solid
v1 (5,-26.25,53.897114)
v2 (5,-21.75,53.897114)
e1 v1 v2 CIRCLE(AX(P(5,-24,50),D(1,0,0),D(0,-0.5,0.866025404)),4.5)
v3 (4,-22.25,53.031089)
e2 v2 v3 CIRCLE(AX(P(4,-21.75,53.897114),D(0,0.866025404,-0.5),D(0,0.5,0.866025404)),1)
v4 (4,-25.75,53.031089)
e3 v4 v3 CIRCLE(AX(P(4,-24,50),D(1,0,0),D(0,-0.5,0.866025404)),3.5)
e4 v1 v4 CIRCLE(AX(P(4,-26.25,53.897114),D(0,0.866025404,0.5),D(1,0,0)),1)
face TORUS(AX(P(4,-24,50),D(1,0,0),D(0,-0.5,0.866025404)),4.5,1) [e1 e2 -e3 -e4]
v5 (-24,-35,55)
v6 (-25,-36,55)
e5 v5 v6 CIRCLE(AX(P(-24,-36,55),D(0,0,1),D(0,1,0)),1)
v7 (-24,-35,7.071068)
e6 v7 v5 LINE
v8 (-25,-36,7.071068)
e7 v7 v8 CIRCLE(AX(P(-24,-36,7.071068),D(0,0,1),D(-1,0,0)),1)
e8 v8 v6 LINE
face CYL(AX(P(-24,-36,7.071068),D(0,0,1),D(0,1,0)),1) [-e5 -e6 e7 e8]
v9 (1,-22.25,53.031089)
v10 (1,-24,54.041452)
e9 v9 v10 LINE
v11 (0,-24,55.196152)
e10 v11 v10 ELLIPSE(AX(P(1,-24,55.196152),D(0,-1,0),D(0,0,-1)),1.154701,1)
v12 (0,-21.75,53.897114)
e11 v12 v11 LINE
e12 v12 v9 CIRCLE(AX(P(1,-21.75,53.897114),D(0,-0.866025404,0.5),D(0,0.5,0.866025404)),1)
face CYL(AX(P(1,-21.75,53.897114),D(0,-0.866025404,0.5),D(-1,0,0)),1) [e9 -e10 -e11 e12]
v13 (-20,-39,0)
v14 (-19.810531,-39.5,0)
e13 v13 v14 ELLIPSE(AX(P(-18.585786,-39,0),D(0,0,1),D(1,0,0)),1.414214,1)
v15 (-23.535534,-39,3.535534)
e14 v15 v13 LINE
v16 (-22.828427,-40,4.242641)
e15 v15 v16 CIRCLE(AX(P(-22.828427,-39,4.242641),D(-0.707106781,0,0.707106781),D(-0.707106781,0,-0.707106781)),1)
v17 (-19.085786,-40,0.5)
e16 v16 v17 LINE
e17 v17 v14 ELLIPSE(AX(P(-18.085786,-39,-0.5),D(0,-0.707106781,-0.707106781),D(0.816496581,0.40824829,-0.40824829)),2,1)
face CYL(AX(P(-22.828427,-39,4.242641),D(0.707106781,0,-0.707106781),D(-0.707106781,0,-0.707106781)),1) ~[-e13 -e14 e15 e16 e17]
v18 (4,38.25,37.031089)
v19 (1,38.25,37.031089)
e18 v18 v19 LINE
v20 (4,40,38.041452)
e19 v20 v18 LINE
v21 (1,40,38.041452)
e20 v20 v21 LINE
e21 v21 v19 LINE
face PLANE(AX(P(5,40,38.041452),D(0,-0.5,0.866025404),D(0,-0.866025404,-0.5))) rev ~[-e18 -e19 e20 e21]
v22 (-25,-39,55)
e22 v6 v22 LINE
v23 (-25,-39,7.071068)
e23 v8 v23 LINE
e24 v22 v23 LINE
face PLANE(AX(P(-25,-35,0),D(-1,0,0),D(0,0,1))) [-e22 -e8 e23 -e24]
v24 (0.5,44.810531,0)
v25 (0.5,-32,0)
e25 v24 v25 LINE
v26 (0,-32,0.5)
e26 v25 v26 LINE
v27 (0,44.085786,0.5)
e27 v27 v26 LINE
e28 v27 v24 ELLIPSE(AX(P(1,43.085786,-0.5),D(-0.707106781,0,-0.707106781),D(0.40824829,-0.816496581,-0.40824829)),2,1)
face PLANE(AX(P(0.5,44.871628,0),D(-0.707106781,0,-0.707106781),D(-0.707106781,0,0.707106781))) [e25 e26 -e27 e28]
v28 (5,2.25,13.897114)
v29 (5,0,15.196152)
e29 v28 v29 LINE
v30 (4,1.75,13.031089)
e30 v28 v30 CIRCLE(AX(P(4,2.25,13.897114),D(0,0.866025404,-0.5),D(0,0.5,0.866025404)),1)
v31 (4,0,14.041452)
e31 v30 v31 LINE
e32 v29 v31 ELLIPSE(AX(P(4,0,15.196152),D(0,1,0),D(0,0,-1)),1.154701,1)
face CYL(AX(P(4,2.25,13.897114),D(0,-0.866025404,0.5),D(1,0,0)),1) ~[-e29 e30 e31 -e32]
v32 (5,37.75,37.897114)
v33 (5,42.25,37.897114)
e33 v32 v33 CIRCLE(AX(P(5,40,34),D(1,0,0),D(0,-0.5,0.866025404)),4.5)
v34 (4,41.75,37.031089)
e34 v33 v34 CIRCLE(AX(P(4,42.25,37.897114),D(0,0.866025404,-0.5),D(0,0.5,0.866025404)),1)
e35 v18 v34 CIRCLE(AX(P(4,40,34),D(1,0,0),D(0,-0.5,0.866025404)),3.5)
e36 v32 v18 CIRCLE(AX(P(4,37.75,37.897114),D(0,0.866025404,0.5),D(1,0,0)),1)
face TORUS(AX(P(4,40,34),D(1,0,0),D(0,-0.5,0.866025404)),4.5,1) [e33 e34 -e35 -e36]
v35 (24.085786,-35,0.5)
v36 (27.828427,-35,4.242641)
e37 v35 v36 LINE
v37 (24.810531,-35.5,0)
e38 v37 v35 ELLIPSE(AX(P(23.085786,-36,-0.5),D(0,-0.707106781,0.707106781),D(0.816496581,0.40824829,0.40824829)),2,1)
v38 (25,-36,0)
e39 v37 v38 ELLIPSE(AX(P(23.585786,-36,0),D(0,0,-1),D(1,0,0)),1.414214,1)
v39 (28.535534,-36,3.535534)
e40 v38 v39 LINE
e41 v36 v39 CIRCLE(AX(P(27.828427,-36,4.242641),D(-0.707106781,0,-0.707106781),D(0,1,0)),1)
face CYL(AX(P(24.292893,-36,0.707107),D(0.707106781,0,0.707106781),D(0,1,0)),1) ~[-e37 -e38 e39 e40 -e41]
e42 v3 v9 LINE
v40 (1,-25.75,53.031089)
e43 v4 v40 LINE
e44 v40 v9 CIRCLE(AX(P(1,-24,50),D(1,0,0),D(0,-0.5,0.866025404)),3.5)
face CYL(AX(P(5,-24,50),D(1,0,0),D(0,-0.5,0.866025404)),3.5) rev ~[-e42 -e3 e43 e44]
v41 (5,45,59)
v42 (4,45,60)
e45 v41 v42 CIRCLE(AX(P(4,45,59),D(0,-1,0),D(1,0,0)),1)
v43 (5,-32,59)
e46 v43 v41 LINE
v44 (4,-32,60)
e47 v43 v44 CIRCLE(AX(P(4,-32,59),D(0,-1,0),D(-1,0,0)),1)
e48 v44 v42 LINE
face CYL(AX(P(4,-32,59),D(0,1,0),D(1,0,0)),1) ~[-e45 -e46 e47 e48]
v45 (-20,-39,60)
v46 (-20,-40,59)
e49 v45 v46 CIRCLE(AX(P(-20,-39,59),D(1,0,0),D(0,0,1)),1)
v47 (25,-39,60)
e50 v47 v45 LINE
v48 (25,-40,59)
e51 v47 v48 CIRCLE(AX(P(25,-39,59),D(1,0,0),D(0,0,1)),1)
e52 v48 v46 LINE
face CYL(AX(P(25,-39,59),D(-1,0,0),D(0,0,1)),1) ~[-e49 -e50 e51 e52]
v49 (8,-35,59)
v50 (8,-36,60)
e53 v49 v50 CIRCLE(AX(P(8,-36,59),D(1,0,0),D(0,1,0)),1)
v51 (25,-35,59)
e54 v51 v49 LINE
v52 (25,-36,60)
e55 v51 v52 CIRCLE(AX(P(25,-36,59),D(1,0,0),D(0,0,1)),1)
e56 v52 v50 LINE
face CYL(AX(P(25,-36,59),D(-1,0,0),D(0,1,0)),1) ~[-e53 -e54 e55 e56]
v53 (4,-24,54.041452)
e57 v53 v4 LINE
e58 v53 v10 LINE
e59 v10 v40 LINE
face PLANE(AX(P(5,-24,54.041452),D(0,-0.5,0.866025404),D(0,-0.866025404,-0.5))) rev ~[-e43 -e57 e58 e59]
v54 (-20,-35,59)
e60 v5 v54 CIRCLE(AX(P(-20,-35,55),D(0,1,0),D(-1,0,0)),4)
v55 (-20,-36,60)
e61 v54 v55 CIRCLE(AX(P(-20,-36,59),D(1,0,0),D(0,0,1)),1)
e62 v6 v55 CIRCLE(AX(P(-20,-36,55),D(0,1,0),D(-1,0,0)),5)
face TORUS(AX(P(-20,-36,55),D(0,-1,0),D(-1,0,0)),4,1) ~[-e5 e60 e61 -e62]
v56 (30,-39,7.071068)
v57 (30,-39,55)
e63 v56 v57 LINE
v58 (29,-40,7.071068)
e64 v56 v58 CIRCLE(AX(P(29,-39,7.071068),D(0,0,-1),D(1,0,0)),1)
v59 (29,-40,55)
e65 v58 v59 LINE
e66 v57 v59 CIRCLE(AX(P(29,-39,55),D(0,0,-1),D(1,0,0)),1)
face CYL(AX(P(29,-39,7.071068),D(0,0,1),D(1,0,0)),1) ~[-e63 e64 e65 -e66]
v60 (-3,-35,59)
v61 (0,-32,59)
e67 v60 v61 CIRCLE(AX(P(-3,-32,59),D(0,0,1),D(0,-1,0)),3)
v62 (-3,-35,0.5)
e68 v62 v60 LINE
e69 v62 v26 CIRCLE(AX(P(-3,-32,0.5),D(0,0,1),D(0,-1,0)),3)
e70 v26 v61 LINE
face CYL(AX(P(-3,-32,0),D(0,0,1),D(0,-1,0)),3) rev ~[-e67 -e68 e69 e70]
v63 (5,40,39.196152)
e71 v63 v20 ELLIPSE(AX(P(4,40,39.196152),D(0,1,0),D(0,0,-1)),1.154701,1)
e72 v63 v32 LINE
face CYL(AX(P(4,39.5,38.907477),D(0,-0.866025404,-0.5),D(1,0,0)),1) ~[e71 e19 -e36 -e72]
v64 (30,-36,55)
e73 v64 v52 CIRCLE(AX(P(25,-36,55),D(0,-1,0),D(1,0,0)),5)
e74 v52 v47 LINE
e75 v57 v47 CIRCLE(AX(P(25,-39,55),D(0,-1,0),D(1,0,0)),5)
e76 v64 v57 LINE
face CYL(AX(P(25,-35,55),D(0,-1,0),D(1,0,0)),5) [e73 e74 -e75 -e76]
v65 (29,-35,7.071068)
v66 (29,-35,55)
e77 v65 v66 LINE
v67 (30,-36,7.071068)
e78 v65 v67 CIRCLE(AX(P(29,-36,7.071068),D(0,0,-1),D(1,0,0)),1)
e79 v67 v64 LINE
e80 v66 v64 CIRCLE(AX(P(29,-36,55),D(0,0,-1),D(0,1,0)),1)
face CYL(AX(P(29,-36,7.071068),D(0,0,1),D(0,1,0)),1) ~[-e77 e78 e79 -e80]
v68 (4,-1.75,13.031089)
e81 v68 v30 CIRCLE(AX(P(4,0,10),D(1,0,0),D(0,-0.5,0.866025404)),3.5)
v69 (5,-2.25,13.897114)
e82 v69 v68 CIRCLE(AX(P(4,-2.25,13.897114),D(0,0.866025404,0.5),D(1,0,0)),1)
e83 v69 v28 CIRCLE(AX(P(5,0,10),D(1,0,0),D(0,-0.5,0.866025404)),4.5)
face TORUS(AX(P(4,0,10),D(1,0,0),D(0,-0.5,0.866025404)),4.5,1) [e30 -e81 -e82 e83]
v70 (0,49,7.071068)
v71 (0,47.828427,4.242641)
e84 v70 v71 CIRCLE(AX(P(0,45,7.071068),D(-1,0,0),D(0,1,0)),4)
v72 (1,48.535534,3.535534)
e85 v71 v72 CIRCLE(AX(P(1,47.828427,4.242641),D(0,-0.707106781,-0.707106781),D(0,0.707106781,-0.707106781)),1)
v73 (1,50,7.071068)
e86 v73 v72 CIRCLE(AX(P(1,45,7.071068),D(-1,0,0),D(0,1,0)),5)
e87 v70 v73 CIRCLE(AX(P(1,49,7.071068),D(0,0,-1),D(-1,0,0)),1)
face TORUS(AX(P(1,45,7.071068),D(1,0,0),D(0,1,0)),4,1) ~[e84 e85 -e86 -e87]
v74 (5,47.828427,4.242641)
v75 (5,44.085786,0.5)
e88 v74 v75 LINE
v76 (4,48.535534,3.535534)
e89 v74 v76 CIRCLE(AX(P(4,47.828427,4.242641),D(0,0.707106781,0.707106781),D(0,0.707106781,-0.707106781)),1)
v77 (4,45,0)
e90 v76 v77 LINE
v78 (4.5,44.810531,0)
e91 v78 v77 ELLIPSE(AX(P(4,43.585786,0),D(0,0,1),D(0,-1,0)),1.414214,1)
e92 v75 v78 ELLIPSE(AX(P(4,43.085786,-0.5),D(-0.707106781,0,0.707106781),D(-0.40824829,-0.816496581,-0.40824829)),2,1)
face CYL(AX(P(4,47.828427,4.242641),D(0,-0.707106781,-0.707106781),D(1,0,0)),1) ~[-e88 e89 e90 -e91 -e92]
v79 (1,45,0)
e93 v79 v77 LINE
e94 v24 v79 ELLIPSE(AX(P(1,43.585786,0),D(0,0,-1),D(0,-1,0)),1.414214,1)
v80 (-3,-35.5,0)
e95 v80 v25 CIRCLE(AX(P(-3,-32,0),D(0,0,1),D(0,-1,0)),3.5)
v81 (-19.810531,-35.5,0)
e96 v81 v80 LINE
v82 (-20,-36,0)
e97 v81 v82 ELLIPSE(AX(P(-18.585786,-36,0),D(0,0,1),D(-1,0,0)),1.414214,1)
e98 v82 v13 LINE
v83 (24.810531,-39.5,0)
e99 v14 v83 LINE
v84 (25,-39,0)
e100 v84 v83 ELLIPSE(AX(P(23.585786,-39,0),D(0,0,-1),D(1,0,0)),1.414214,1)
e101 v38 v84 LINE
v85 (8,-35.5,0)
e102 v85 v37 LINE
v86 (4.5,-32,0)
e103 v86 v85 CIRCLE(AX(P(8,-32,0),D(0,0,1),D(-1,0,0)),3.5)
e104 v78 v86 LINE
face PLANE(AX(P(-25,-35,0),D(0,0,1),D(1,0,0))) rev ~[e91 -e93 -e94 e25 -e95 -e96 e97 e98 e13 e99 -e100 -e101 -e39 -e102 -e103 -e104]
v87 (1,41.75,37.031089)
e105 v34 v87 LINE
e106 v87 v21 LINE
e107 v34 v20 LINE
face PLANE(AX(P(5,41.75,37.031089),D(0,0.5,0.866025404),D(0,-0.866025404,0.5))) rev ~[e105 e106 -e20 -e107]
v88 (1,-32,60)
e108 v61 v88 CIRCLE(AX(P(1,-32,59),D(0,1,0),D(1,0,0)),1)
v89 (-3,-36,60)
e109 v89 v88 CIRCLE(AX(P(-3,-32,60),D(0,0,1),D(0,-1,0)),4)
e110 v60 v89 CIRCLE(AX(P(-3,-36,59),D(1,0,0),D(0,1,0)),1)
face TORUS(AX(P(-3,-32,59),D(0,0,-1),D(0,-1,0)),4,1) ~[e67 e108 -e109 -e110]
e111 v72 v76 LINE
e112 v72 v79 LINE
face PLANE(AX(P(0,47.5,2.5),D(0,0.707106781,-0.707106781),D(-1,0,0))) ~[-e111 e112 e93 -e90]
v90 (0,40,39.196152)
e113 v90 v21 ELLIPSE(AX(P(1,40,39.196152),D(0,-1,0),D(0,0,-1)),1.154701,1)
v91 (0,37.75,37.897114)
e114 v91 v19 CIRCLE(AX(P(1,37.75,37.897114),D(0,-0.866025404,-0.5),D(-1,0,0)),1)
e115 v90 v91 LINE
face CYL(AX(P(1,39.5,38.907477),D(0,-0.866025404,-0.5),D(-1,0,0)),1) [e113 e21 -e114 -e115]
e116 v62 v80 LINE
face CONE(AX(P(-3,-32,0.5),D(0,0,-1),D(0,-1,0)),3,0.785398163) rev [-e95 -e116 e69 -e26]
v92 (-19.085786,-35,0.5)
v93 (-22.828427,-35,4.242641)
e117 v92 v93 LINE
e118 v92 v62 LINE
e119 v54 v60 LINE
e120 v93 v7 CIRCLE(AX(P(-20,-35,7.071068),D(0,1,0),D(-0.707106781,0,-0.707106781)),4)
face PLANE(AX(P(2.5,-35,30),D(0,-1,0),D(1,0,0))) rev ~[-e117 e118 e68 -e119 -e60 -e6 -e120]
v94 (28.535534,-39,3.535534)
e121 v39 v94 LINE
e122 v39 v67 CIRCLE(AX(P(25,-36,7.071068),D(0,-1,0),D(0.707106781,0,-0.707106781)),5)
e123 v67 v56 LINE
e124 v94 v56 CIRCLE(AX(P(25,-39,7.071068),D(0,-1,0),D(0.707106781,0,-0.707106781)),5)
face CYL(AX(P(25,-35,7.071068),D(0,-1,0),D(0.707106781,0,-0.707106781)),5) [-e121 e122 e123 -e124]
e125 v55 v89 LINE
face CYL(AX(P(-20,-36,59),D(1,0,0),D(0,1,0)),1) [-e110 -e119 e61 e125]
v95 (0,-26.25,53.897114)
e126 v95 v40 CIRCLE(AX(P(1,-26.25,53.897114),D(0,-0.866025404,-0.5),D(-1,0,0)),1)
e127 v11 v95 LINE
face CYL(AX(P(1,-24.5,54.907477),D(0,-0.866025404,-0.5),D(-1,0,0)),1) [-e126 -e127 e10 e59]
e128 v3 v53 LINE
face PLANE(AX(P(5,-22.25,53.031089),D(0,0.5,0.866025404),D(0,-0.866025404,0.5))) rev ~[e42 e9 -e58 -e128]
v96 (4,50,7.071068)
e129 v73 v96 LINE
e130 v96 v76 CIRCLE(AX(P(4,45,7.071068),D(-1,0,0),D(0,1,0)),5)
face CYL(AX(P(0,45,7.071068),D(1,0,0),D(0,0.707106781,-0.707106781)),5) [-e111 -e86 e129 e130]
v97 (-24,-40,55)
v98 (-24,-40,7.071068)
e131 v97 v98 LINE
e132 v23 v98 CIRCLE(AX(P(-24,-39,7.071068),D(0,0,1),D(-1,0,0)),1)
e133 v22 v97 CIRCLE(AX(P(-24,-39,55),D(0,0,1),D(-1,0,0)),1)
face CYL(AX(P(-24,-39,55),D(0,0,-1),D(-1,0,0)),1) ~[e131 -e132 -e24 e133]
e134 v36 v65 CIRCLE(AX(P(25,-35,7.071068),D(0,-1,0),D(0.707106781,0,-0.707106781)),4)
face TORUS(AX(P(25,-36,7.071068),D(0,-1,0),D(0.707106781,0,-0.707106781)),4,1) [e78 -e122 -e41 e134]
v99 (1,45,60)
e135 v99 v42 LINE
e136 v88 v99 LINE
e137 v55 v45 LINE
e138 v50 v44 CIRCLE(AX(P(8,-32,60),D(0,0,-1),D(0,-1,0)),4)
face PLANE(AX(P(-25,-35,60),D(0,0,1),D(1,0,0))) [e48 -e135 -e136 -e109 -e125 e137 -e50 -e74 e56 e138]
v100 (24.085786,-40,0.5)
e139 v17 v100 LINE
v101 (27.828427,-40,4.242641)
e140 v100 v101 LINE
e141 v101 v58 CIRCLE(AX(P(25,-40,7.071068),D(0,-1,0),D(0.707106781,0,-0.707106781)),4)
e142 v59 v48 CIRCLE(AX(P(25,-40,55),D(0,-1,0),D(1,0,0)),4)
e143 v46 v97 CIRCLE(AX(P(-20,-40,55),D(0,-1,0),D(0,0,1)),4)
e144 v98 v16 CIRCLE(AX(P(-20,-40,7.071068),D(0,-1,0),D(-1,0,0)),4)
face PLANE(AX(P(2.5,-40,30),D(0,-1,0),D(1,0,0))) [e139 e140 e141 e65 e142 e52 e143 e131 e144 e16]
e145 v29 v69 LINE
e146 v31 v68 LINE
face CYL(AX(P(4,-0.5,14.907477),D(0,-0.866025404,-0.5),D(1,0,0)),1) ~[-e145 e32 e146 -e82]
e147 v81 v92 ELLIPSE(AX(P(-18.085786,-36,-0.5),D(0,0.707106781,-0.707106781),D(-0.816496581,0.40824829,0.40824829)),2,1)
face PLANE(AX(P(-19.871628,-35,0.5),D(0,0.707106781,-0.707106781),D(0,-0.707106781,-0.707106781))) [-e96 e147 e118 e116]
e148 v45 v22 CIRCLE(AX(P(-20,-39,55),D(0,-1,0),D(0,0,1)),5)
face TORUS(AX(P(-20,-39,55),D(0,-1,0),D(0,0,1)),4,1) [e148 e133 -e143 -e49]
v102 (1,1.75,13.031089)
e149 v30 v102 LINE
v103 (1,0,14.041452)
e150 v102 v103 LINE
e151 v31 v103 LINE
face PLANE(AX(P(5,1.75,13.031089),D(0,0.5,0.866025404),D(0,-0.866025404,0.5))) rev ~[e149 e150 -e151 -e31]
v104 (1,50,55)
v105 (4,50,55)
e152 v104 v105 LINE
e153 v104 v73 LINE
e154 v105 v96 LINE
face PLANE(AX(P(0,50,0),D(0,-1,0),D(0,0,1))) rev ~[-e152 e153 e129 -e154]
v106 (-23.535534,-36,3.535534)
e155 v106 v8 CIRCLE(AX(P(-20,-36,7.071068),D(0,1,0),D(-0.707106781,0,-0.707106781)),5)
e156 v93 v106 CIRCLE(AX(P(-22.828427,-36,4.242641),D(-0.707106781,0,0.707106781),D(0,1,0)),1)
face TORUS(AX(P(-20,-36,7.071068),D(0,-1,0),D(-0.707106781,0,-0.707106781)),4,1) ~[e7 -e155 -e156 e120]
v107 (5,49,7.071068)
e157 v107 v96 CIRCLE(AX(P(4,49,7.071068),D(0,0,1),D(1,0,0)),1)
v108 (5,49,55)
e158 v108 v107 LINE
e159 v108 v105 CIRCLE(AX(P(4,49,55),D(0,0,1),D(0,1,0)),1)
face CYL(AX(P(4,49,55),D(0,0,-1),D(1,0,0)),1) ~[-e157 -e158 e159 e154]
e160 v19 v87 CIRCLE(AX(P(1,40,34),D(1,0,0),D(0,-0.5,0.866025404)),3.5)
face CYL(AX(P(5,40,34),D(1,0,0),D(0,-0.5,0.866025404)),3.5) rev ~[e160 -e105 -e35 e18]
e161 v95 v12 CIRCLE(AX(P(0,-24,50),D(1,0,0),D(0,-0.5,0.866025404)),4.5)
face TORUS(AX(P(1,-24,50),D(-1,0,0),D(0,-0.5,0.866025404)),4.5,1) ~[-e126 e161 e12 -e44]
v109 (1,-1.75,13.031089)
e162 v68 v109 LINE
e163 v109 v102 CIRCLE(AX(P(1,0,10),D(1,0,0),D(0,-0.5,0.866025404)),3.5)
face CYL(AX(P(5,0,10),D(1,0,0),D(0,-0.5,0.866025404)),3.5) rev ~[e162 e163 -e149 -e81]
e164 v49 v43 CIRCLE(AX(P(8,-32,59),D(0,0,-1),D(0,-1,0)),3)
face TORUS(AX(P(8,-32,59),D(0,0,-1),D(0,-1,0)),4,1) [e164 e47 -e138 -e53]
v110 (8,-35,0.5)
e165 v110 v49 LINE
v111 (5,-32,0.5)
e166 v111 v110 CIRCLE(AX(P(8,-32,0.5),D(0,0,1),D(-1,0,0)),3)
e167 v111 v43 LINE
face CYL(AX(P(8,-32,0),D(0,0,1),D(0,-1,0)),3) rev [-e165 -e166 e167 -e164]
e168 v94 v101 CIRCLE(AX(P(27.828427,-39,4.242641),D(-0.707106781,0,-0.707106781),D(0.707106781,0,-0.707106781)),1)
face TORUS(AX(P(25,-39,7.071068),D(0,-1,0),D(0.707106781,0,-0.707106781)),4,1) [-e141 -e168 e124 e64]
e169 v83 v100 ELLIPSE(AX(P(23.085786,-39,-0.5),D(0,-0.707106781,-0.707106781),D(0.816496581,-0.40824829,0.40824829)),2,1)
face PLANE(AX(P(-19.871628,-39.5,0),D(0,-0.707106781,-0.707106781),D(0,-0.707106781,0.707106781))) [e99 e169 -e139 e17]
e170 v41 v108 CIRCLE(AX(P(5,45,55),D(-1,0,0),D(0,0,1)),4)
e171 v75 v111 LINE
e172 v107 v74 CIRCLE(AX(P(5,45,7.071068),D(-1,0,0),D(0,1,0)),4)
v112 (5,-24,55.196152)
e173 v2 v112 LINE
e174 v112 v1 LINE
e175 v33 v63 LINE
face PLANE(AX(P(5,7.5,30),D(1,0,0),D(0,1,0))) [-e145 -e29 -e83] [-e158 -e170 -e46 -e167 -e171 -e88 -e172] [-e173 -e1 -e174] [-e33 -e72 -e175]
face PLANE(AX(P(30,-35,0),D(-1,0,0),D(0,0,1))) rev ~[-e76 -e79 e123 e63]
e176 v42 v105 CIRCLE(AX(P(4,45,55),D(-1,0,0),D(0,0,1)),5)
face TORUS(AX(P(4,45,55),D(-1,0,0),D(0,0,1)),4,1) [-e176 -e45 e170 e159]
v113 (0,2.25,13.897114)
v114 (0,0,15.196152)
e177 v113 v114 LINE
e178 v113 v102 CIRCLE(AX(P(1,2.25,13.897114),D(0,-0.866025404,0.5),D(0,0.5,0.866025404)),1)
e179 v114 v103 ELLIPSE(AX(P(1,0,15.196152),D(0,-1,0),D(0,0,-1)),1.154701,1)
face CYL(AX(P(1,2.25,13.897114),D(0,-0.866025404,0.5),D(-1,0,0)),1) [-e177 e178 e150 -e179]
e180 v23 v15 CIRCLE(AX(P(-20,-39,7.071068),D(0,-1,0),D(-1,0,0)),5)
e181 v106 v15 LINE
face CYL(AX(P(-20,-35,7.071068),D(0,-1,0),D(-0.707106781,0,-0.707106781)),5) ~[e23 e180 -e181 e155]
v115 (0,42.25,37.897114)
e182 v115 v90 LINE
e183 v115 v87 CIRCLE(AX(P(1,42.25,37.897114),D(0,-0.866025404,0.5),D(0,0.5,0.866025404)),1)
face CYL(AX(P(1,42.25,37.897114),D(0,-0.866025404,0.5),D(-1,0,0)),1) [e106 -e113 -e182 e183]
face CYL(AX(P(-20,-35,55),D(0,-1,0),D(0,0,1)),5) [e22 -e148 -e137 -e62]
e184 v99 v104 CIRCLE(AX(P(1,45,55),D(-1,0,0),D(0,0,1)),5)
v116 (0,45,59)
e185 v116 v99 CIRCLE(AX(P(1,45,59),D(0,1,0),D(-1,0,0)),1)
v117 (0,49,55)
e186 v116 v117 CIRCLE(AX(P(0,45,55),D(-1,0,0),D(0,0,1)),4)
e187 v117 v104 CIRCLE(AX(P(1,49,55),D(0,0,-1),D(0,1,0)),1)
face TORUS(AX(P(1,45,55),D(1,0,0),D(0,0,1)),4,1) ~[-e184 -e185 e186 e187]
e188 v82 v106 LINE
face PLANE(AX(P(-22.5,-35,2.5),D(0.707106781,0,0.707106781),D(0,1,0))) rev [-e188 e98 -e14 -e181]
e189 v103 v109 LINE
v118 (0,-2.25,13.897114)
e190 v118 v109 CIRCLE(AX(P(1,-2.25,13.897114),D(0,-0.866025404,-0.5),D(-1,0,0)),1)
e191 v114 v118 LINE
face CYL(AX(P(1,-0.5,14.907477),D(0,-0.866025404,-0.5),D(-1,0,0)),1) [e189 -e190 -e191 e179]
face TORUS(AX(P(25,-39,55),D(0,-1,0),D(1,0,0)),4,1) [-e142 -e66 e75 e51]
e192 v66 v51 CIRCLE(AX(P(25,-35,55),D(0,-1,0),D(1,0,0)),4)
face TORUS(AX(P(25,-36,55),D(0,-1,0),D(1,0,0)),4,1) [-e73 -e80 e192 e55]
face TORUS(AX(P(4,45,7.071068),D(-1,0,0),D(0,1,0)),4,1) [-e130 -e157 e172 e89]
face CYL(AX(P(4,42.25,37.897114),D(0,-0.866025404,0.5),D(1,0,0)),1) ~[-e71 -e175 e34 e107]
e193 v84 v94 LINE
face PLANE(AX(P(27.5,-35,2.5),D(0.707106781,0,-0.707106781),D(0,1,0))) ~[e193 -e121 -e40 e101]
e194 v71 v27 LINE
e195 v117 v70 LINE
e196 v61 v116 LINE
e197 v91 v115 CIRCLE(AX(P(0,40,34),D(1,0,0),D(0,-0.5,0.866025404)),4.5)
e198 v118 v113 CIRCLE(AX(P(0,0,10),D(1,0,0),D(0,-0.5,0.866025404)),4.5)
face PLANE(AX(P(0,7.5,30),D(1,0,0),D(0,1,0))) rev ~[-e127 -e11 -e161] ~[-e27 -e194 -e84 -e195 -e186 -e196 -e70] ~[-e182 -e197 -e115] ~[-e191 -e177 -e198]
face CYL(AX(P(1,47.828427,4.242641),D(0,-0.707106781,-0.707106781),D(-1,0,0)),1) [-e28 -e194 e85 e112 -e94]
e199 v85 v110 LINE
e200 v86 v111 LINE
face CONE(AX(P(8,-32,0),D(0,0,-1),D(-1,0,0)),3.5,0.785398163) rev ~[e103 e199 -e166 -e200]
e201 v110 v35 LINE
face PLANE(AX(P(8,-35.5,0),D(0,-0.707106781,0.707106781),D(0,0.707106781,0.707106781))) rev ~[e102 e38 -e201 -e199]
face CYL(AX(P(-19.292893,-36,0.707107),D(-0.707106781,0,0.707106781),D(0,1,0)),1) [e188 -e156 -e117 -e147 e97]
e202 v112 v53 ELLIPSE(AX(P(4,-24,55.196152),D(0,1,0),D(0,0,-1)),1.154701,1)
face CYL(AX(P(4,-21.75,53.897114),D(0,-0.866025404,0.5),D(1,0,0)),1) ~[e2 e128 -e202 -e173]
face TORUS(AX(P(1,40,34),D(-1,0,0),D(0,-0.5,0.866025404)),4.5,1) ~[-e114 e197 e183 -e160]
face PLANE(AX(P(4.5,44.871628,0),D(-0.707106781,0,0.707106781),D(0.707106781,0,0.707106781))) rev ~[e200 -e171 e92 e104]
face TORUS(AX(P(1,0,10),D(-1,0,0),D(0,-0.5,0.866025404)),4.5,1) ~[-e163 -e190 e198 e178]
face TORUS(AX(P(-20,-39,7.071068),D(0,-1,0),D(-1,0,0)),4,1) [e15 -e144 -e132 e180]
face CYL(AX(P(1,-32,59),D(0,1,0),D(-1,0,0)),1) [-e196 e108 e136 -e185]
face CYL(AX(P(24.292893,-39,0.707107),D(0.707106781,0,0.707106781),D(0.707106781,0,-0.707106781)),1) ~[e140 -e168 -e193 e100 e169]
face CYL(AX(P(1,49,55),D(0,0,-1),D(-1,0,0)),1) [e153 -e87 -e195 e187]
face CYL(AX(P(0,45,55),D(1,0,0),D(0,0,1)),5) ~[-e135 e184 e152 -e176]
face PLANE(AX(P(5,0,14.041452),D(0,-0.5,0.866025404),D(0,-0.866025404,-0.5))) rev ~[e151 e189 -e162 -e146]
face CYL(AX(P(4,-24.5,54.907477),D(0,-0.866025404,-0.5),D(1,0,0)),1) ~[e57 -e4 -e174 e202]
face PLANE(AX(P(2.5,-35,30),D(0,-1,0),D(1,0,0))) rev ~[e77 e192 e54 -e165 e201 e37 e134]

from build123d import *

# Parameters (mm, degrees)
F0_W          = 85
F0_H          = 60
F1_DEPTH      = 5
F2_W          = 55
F2_H          = 60
F3_DEPTH      = 5
F5_DEPTH      = 5
F6_R          = 3
F7_SIZE       = 5
F8_R          = 5
F9_R          = 1
F10_T1_DEPTH  = 16.8716279316
F10_T3_DEPTH  = 76.8716279316
F10_T5_DEPTH  = 16.8716279316
F10_T7_DEPTH  = 44.7432558632
F10_T10_ANGLE = 90
F10_T12_ANGLE = 90


# Not quite as in the source:
# - a fillet or chamfer that OpenCascade refuses, or shapes differently, is made with other operations: its cross-section is extruded or revolved along the edge and cut away or added


with BuildPart() as f1:
    # F0 (on Right) → F1 (new body)
    with BuildSketch(Plane.YZ):
        with Locations((7.5, 30)):
            Rectangle(F0_W, F0_H)
    extrude(amount=F1_DEPTH)

    # F2 (on face) → F3 (join)
    with BuildSketch(Plane.XZ.offset(35)):
        with Locations((2.5, 30)):
            Rectangle(F2_W, F2_H)
    extrude(amount=F3_DEPTH)

    # F4 (on face) → F5 (cut, through all)
    with BuildSketch(Plane.YZ.offset(5)):
        with BuildLine():
            Line((-24, 54.0414518843), (-25.75, 53.0310889132))
            ThreePointArc((-25.75, 53.0310889132), (-24, 46.5), (-22.25, 53.0310889132))
            Line((-22.25, 53.0310889132), (-24, 54.0414518843))
        make_face()
        with BuildLine():
            Line((0, 14.0414518843), (-1.75, 13.0310889132))
            ThreePointArc((-1.75, 13.0310889132), (0, 6.5), (1.75, 13.0310889132))
            Line((1.75, 13.0310889132), (0, 14.0414518843))
        make_face()
        with BuildLine():
            Line((40, 38.0414518843), (38.25, 37.0310889132))
            ThreePointArc((38.25, 37.0310889132), (40, 30.5), (41.75, 37.0310889132))
            Line((41.75, 37.0310889132), (40, 38.0414518843))
        make_face()
    extrude(amount=-F5_DEPTH, mode=Mode.SUBTRACT)

    # F6
    f6_edges = [f1.edges().sort_by_distance(p)[0] for p in [
        (5, -35, 30),
        (0, -35, 30),
    ]]
    fillet(f6_edges, radius=F6_R)

    # F7
    f7_edges = [f1.edges().sort_by_distance(p)[0] for p in [
        (30, -37.5, 0),
        (2.5, 50, 0),
        (-25, -37.5, 0),
    ]]
    chamfer(f7_edges, length=F7_SIZE)

    # F8
    f8_edges = [f1.edges().sort_by_distance(p)[0] for p in [
        (30, -37.5, 60),
        (-25, -37.5, 60),
        (2.5, 50, 60),
        (30, -37.5, 5),
        (2.5, 50, 5),
        (-25, -37.5, 5),
    ]]
    fillet(f8_edges, radius=F8_R)

    # F9
    f9_edges = [f1.edges().sort_by_distance(p)[0] for p in [
        (30, -35, 31.035534),
        (-25, -35, 31.035534),
        (30, -40, 31.035534),
        (2.5, -25.75, 53.031089),
        (2.5, -22.25, 53.031089),
        (5, -24, 46.5),
        (0, -24, 46.5),
        (2.5, -1.75, 13.031089),
        (2.5, 1.75, 13.031089),
        (5, 0, 6.5),
        (0, 0, 6.5),
        (2.5, 38.25, 37.031089),
        (2.5, 41.75, 37.031089),
        (5, 40, 30.5),
        (0, 40, 30.5),
        (-23.535534, -35, 58.535534),
        (-24.619398, -35, 5.157651),
        (-11.5, -35, 60),
        (-21.767767, -35, 1.767767),
        (-25, -40, 31.035534),
        (-23.535534, -40, 58.535534),
        (-24.619398, -40, 5.157651),
        (-0.87868, -34.12132, 60),
        (2.5, -40, 60),
        (0, 6.5, 60),
        (16.5, -35, 60),
        (5, 6.5, 60),
        (5.87868, -34.12132, 60),
        (-21.767767, -40, 1.767767),
        (28.535534, -40, 58.535534),
        (26.767767, -40, 1.767767),
        (29.619398, -40, 5.157651),
        (0, 50, 31.035534),
        (0, 49.619398, 5.157651),
        (0, 48.535534, 58.535534),
        (0, 46.767767, 1.767767),
        (0, 0.875, 13.53627),
        (0, -0.875, 13.53627),
        (0, -23.125, 53.53627),
        (0, -24.875, 53.53627),
        (0, 39.125, 37.53627),
        (0, 40.875, 37.53627),
        (28.535534, -35, 58.535534),
        (5, 48.535534, 58.535534),
        (29.619398, -35, 5.157651),
        (26.767767, -35, 1.767767),
        (5, 50, 31.035534),
        (5, 49.619398, 5.157651),
        (5, 46.767767, 1.767767),
        (5, 0.875, 13.53627),
        (5, -0.875, 13.53627),
        (5, -23.125, 53.53627),
        (5, -24.875, 53.53627),
        (5, 39.125, 37.53627),
        (5, 40.875, 37.53627),
    ]]
    fillet(f9_edges, radius=F9_R)

    # F10: chamfer of 0.5 on 7 edges, made by hand

    # F10_s2 → F10_t1 (cut)
    with BuildSketch(Plane.YZ.offset(-19.8716279316)):
        Polygon((-35, 0.5), (-35.5, 0), (-35, 0), align=None)
    extrude(amount=F10_T1_DEPTH, mode=Mode.SUBTRACT)

    # F10_s4 → F10_t3 (cut)
    with BuildSketch(Plane.XZ.offset(-44.8716279316)):
        Polygon((0.5, 0), (0, 0.5), (0, 0), align=None)
        Polygon((4.5, 0), (5, 0.5), (5, 0), align=None)
    extrude(amount=F10_T3_DEPTH, mode=Mode.SUBTRACT)

    # F10_s6 → F10_t5 (cut)
    with BuildSketch(Plane.YZ.offset(8)):
        Polygon((-35.5, 0), (-35, 0.5), (-35, 0), align=None)
    extrude(amount=F10_T5_DEPTH, mode=Mode.SUBTRACT)

    # F10_s8 → F10_t7 (cut)
    with BuildSketch(Plane.YZ.offset(-19.8716279316)):
        Polygon((-39.5, 0), (-40, 0.5), (-40, 0), align=None)
    extrude(amount=F10_T7_DEPTH, mode=Mode.SUBTRACT)

    # F10_s9 → F10_t10 (revolve, cut)
    with BuildSketch(Plane.YZ.offset(-3)):
        Polygon((-35, 0.5), (-35.5, 0), (-35, 0), align=None)
    revolve(axis=Axis((-3, -32, 0), (0, 0, 1)), revolution_arc=F10_T10_ANGLE, mode=Mode.SUBTRACT)

    # F10_s11 → F10_t12 (revolve, cut)
    with BuildSketch(Plane.XZ.offset(32)):
        Polygon((4.5, 0), (5, 0.5), (5, 0), align=None)
    revolve(axis=Axis((8, -32, 0), (0, 0, 1)), revolution_arc=F10_T12_ANGLE, mode=Mode.SUBTRACT)


solid = f1.part
